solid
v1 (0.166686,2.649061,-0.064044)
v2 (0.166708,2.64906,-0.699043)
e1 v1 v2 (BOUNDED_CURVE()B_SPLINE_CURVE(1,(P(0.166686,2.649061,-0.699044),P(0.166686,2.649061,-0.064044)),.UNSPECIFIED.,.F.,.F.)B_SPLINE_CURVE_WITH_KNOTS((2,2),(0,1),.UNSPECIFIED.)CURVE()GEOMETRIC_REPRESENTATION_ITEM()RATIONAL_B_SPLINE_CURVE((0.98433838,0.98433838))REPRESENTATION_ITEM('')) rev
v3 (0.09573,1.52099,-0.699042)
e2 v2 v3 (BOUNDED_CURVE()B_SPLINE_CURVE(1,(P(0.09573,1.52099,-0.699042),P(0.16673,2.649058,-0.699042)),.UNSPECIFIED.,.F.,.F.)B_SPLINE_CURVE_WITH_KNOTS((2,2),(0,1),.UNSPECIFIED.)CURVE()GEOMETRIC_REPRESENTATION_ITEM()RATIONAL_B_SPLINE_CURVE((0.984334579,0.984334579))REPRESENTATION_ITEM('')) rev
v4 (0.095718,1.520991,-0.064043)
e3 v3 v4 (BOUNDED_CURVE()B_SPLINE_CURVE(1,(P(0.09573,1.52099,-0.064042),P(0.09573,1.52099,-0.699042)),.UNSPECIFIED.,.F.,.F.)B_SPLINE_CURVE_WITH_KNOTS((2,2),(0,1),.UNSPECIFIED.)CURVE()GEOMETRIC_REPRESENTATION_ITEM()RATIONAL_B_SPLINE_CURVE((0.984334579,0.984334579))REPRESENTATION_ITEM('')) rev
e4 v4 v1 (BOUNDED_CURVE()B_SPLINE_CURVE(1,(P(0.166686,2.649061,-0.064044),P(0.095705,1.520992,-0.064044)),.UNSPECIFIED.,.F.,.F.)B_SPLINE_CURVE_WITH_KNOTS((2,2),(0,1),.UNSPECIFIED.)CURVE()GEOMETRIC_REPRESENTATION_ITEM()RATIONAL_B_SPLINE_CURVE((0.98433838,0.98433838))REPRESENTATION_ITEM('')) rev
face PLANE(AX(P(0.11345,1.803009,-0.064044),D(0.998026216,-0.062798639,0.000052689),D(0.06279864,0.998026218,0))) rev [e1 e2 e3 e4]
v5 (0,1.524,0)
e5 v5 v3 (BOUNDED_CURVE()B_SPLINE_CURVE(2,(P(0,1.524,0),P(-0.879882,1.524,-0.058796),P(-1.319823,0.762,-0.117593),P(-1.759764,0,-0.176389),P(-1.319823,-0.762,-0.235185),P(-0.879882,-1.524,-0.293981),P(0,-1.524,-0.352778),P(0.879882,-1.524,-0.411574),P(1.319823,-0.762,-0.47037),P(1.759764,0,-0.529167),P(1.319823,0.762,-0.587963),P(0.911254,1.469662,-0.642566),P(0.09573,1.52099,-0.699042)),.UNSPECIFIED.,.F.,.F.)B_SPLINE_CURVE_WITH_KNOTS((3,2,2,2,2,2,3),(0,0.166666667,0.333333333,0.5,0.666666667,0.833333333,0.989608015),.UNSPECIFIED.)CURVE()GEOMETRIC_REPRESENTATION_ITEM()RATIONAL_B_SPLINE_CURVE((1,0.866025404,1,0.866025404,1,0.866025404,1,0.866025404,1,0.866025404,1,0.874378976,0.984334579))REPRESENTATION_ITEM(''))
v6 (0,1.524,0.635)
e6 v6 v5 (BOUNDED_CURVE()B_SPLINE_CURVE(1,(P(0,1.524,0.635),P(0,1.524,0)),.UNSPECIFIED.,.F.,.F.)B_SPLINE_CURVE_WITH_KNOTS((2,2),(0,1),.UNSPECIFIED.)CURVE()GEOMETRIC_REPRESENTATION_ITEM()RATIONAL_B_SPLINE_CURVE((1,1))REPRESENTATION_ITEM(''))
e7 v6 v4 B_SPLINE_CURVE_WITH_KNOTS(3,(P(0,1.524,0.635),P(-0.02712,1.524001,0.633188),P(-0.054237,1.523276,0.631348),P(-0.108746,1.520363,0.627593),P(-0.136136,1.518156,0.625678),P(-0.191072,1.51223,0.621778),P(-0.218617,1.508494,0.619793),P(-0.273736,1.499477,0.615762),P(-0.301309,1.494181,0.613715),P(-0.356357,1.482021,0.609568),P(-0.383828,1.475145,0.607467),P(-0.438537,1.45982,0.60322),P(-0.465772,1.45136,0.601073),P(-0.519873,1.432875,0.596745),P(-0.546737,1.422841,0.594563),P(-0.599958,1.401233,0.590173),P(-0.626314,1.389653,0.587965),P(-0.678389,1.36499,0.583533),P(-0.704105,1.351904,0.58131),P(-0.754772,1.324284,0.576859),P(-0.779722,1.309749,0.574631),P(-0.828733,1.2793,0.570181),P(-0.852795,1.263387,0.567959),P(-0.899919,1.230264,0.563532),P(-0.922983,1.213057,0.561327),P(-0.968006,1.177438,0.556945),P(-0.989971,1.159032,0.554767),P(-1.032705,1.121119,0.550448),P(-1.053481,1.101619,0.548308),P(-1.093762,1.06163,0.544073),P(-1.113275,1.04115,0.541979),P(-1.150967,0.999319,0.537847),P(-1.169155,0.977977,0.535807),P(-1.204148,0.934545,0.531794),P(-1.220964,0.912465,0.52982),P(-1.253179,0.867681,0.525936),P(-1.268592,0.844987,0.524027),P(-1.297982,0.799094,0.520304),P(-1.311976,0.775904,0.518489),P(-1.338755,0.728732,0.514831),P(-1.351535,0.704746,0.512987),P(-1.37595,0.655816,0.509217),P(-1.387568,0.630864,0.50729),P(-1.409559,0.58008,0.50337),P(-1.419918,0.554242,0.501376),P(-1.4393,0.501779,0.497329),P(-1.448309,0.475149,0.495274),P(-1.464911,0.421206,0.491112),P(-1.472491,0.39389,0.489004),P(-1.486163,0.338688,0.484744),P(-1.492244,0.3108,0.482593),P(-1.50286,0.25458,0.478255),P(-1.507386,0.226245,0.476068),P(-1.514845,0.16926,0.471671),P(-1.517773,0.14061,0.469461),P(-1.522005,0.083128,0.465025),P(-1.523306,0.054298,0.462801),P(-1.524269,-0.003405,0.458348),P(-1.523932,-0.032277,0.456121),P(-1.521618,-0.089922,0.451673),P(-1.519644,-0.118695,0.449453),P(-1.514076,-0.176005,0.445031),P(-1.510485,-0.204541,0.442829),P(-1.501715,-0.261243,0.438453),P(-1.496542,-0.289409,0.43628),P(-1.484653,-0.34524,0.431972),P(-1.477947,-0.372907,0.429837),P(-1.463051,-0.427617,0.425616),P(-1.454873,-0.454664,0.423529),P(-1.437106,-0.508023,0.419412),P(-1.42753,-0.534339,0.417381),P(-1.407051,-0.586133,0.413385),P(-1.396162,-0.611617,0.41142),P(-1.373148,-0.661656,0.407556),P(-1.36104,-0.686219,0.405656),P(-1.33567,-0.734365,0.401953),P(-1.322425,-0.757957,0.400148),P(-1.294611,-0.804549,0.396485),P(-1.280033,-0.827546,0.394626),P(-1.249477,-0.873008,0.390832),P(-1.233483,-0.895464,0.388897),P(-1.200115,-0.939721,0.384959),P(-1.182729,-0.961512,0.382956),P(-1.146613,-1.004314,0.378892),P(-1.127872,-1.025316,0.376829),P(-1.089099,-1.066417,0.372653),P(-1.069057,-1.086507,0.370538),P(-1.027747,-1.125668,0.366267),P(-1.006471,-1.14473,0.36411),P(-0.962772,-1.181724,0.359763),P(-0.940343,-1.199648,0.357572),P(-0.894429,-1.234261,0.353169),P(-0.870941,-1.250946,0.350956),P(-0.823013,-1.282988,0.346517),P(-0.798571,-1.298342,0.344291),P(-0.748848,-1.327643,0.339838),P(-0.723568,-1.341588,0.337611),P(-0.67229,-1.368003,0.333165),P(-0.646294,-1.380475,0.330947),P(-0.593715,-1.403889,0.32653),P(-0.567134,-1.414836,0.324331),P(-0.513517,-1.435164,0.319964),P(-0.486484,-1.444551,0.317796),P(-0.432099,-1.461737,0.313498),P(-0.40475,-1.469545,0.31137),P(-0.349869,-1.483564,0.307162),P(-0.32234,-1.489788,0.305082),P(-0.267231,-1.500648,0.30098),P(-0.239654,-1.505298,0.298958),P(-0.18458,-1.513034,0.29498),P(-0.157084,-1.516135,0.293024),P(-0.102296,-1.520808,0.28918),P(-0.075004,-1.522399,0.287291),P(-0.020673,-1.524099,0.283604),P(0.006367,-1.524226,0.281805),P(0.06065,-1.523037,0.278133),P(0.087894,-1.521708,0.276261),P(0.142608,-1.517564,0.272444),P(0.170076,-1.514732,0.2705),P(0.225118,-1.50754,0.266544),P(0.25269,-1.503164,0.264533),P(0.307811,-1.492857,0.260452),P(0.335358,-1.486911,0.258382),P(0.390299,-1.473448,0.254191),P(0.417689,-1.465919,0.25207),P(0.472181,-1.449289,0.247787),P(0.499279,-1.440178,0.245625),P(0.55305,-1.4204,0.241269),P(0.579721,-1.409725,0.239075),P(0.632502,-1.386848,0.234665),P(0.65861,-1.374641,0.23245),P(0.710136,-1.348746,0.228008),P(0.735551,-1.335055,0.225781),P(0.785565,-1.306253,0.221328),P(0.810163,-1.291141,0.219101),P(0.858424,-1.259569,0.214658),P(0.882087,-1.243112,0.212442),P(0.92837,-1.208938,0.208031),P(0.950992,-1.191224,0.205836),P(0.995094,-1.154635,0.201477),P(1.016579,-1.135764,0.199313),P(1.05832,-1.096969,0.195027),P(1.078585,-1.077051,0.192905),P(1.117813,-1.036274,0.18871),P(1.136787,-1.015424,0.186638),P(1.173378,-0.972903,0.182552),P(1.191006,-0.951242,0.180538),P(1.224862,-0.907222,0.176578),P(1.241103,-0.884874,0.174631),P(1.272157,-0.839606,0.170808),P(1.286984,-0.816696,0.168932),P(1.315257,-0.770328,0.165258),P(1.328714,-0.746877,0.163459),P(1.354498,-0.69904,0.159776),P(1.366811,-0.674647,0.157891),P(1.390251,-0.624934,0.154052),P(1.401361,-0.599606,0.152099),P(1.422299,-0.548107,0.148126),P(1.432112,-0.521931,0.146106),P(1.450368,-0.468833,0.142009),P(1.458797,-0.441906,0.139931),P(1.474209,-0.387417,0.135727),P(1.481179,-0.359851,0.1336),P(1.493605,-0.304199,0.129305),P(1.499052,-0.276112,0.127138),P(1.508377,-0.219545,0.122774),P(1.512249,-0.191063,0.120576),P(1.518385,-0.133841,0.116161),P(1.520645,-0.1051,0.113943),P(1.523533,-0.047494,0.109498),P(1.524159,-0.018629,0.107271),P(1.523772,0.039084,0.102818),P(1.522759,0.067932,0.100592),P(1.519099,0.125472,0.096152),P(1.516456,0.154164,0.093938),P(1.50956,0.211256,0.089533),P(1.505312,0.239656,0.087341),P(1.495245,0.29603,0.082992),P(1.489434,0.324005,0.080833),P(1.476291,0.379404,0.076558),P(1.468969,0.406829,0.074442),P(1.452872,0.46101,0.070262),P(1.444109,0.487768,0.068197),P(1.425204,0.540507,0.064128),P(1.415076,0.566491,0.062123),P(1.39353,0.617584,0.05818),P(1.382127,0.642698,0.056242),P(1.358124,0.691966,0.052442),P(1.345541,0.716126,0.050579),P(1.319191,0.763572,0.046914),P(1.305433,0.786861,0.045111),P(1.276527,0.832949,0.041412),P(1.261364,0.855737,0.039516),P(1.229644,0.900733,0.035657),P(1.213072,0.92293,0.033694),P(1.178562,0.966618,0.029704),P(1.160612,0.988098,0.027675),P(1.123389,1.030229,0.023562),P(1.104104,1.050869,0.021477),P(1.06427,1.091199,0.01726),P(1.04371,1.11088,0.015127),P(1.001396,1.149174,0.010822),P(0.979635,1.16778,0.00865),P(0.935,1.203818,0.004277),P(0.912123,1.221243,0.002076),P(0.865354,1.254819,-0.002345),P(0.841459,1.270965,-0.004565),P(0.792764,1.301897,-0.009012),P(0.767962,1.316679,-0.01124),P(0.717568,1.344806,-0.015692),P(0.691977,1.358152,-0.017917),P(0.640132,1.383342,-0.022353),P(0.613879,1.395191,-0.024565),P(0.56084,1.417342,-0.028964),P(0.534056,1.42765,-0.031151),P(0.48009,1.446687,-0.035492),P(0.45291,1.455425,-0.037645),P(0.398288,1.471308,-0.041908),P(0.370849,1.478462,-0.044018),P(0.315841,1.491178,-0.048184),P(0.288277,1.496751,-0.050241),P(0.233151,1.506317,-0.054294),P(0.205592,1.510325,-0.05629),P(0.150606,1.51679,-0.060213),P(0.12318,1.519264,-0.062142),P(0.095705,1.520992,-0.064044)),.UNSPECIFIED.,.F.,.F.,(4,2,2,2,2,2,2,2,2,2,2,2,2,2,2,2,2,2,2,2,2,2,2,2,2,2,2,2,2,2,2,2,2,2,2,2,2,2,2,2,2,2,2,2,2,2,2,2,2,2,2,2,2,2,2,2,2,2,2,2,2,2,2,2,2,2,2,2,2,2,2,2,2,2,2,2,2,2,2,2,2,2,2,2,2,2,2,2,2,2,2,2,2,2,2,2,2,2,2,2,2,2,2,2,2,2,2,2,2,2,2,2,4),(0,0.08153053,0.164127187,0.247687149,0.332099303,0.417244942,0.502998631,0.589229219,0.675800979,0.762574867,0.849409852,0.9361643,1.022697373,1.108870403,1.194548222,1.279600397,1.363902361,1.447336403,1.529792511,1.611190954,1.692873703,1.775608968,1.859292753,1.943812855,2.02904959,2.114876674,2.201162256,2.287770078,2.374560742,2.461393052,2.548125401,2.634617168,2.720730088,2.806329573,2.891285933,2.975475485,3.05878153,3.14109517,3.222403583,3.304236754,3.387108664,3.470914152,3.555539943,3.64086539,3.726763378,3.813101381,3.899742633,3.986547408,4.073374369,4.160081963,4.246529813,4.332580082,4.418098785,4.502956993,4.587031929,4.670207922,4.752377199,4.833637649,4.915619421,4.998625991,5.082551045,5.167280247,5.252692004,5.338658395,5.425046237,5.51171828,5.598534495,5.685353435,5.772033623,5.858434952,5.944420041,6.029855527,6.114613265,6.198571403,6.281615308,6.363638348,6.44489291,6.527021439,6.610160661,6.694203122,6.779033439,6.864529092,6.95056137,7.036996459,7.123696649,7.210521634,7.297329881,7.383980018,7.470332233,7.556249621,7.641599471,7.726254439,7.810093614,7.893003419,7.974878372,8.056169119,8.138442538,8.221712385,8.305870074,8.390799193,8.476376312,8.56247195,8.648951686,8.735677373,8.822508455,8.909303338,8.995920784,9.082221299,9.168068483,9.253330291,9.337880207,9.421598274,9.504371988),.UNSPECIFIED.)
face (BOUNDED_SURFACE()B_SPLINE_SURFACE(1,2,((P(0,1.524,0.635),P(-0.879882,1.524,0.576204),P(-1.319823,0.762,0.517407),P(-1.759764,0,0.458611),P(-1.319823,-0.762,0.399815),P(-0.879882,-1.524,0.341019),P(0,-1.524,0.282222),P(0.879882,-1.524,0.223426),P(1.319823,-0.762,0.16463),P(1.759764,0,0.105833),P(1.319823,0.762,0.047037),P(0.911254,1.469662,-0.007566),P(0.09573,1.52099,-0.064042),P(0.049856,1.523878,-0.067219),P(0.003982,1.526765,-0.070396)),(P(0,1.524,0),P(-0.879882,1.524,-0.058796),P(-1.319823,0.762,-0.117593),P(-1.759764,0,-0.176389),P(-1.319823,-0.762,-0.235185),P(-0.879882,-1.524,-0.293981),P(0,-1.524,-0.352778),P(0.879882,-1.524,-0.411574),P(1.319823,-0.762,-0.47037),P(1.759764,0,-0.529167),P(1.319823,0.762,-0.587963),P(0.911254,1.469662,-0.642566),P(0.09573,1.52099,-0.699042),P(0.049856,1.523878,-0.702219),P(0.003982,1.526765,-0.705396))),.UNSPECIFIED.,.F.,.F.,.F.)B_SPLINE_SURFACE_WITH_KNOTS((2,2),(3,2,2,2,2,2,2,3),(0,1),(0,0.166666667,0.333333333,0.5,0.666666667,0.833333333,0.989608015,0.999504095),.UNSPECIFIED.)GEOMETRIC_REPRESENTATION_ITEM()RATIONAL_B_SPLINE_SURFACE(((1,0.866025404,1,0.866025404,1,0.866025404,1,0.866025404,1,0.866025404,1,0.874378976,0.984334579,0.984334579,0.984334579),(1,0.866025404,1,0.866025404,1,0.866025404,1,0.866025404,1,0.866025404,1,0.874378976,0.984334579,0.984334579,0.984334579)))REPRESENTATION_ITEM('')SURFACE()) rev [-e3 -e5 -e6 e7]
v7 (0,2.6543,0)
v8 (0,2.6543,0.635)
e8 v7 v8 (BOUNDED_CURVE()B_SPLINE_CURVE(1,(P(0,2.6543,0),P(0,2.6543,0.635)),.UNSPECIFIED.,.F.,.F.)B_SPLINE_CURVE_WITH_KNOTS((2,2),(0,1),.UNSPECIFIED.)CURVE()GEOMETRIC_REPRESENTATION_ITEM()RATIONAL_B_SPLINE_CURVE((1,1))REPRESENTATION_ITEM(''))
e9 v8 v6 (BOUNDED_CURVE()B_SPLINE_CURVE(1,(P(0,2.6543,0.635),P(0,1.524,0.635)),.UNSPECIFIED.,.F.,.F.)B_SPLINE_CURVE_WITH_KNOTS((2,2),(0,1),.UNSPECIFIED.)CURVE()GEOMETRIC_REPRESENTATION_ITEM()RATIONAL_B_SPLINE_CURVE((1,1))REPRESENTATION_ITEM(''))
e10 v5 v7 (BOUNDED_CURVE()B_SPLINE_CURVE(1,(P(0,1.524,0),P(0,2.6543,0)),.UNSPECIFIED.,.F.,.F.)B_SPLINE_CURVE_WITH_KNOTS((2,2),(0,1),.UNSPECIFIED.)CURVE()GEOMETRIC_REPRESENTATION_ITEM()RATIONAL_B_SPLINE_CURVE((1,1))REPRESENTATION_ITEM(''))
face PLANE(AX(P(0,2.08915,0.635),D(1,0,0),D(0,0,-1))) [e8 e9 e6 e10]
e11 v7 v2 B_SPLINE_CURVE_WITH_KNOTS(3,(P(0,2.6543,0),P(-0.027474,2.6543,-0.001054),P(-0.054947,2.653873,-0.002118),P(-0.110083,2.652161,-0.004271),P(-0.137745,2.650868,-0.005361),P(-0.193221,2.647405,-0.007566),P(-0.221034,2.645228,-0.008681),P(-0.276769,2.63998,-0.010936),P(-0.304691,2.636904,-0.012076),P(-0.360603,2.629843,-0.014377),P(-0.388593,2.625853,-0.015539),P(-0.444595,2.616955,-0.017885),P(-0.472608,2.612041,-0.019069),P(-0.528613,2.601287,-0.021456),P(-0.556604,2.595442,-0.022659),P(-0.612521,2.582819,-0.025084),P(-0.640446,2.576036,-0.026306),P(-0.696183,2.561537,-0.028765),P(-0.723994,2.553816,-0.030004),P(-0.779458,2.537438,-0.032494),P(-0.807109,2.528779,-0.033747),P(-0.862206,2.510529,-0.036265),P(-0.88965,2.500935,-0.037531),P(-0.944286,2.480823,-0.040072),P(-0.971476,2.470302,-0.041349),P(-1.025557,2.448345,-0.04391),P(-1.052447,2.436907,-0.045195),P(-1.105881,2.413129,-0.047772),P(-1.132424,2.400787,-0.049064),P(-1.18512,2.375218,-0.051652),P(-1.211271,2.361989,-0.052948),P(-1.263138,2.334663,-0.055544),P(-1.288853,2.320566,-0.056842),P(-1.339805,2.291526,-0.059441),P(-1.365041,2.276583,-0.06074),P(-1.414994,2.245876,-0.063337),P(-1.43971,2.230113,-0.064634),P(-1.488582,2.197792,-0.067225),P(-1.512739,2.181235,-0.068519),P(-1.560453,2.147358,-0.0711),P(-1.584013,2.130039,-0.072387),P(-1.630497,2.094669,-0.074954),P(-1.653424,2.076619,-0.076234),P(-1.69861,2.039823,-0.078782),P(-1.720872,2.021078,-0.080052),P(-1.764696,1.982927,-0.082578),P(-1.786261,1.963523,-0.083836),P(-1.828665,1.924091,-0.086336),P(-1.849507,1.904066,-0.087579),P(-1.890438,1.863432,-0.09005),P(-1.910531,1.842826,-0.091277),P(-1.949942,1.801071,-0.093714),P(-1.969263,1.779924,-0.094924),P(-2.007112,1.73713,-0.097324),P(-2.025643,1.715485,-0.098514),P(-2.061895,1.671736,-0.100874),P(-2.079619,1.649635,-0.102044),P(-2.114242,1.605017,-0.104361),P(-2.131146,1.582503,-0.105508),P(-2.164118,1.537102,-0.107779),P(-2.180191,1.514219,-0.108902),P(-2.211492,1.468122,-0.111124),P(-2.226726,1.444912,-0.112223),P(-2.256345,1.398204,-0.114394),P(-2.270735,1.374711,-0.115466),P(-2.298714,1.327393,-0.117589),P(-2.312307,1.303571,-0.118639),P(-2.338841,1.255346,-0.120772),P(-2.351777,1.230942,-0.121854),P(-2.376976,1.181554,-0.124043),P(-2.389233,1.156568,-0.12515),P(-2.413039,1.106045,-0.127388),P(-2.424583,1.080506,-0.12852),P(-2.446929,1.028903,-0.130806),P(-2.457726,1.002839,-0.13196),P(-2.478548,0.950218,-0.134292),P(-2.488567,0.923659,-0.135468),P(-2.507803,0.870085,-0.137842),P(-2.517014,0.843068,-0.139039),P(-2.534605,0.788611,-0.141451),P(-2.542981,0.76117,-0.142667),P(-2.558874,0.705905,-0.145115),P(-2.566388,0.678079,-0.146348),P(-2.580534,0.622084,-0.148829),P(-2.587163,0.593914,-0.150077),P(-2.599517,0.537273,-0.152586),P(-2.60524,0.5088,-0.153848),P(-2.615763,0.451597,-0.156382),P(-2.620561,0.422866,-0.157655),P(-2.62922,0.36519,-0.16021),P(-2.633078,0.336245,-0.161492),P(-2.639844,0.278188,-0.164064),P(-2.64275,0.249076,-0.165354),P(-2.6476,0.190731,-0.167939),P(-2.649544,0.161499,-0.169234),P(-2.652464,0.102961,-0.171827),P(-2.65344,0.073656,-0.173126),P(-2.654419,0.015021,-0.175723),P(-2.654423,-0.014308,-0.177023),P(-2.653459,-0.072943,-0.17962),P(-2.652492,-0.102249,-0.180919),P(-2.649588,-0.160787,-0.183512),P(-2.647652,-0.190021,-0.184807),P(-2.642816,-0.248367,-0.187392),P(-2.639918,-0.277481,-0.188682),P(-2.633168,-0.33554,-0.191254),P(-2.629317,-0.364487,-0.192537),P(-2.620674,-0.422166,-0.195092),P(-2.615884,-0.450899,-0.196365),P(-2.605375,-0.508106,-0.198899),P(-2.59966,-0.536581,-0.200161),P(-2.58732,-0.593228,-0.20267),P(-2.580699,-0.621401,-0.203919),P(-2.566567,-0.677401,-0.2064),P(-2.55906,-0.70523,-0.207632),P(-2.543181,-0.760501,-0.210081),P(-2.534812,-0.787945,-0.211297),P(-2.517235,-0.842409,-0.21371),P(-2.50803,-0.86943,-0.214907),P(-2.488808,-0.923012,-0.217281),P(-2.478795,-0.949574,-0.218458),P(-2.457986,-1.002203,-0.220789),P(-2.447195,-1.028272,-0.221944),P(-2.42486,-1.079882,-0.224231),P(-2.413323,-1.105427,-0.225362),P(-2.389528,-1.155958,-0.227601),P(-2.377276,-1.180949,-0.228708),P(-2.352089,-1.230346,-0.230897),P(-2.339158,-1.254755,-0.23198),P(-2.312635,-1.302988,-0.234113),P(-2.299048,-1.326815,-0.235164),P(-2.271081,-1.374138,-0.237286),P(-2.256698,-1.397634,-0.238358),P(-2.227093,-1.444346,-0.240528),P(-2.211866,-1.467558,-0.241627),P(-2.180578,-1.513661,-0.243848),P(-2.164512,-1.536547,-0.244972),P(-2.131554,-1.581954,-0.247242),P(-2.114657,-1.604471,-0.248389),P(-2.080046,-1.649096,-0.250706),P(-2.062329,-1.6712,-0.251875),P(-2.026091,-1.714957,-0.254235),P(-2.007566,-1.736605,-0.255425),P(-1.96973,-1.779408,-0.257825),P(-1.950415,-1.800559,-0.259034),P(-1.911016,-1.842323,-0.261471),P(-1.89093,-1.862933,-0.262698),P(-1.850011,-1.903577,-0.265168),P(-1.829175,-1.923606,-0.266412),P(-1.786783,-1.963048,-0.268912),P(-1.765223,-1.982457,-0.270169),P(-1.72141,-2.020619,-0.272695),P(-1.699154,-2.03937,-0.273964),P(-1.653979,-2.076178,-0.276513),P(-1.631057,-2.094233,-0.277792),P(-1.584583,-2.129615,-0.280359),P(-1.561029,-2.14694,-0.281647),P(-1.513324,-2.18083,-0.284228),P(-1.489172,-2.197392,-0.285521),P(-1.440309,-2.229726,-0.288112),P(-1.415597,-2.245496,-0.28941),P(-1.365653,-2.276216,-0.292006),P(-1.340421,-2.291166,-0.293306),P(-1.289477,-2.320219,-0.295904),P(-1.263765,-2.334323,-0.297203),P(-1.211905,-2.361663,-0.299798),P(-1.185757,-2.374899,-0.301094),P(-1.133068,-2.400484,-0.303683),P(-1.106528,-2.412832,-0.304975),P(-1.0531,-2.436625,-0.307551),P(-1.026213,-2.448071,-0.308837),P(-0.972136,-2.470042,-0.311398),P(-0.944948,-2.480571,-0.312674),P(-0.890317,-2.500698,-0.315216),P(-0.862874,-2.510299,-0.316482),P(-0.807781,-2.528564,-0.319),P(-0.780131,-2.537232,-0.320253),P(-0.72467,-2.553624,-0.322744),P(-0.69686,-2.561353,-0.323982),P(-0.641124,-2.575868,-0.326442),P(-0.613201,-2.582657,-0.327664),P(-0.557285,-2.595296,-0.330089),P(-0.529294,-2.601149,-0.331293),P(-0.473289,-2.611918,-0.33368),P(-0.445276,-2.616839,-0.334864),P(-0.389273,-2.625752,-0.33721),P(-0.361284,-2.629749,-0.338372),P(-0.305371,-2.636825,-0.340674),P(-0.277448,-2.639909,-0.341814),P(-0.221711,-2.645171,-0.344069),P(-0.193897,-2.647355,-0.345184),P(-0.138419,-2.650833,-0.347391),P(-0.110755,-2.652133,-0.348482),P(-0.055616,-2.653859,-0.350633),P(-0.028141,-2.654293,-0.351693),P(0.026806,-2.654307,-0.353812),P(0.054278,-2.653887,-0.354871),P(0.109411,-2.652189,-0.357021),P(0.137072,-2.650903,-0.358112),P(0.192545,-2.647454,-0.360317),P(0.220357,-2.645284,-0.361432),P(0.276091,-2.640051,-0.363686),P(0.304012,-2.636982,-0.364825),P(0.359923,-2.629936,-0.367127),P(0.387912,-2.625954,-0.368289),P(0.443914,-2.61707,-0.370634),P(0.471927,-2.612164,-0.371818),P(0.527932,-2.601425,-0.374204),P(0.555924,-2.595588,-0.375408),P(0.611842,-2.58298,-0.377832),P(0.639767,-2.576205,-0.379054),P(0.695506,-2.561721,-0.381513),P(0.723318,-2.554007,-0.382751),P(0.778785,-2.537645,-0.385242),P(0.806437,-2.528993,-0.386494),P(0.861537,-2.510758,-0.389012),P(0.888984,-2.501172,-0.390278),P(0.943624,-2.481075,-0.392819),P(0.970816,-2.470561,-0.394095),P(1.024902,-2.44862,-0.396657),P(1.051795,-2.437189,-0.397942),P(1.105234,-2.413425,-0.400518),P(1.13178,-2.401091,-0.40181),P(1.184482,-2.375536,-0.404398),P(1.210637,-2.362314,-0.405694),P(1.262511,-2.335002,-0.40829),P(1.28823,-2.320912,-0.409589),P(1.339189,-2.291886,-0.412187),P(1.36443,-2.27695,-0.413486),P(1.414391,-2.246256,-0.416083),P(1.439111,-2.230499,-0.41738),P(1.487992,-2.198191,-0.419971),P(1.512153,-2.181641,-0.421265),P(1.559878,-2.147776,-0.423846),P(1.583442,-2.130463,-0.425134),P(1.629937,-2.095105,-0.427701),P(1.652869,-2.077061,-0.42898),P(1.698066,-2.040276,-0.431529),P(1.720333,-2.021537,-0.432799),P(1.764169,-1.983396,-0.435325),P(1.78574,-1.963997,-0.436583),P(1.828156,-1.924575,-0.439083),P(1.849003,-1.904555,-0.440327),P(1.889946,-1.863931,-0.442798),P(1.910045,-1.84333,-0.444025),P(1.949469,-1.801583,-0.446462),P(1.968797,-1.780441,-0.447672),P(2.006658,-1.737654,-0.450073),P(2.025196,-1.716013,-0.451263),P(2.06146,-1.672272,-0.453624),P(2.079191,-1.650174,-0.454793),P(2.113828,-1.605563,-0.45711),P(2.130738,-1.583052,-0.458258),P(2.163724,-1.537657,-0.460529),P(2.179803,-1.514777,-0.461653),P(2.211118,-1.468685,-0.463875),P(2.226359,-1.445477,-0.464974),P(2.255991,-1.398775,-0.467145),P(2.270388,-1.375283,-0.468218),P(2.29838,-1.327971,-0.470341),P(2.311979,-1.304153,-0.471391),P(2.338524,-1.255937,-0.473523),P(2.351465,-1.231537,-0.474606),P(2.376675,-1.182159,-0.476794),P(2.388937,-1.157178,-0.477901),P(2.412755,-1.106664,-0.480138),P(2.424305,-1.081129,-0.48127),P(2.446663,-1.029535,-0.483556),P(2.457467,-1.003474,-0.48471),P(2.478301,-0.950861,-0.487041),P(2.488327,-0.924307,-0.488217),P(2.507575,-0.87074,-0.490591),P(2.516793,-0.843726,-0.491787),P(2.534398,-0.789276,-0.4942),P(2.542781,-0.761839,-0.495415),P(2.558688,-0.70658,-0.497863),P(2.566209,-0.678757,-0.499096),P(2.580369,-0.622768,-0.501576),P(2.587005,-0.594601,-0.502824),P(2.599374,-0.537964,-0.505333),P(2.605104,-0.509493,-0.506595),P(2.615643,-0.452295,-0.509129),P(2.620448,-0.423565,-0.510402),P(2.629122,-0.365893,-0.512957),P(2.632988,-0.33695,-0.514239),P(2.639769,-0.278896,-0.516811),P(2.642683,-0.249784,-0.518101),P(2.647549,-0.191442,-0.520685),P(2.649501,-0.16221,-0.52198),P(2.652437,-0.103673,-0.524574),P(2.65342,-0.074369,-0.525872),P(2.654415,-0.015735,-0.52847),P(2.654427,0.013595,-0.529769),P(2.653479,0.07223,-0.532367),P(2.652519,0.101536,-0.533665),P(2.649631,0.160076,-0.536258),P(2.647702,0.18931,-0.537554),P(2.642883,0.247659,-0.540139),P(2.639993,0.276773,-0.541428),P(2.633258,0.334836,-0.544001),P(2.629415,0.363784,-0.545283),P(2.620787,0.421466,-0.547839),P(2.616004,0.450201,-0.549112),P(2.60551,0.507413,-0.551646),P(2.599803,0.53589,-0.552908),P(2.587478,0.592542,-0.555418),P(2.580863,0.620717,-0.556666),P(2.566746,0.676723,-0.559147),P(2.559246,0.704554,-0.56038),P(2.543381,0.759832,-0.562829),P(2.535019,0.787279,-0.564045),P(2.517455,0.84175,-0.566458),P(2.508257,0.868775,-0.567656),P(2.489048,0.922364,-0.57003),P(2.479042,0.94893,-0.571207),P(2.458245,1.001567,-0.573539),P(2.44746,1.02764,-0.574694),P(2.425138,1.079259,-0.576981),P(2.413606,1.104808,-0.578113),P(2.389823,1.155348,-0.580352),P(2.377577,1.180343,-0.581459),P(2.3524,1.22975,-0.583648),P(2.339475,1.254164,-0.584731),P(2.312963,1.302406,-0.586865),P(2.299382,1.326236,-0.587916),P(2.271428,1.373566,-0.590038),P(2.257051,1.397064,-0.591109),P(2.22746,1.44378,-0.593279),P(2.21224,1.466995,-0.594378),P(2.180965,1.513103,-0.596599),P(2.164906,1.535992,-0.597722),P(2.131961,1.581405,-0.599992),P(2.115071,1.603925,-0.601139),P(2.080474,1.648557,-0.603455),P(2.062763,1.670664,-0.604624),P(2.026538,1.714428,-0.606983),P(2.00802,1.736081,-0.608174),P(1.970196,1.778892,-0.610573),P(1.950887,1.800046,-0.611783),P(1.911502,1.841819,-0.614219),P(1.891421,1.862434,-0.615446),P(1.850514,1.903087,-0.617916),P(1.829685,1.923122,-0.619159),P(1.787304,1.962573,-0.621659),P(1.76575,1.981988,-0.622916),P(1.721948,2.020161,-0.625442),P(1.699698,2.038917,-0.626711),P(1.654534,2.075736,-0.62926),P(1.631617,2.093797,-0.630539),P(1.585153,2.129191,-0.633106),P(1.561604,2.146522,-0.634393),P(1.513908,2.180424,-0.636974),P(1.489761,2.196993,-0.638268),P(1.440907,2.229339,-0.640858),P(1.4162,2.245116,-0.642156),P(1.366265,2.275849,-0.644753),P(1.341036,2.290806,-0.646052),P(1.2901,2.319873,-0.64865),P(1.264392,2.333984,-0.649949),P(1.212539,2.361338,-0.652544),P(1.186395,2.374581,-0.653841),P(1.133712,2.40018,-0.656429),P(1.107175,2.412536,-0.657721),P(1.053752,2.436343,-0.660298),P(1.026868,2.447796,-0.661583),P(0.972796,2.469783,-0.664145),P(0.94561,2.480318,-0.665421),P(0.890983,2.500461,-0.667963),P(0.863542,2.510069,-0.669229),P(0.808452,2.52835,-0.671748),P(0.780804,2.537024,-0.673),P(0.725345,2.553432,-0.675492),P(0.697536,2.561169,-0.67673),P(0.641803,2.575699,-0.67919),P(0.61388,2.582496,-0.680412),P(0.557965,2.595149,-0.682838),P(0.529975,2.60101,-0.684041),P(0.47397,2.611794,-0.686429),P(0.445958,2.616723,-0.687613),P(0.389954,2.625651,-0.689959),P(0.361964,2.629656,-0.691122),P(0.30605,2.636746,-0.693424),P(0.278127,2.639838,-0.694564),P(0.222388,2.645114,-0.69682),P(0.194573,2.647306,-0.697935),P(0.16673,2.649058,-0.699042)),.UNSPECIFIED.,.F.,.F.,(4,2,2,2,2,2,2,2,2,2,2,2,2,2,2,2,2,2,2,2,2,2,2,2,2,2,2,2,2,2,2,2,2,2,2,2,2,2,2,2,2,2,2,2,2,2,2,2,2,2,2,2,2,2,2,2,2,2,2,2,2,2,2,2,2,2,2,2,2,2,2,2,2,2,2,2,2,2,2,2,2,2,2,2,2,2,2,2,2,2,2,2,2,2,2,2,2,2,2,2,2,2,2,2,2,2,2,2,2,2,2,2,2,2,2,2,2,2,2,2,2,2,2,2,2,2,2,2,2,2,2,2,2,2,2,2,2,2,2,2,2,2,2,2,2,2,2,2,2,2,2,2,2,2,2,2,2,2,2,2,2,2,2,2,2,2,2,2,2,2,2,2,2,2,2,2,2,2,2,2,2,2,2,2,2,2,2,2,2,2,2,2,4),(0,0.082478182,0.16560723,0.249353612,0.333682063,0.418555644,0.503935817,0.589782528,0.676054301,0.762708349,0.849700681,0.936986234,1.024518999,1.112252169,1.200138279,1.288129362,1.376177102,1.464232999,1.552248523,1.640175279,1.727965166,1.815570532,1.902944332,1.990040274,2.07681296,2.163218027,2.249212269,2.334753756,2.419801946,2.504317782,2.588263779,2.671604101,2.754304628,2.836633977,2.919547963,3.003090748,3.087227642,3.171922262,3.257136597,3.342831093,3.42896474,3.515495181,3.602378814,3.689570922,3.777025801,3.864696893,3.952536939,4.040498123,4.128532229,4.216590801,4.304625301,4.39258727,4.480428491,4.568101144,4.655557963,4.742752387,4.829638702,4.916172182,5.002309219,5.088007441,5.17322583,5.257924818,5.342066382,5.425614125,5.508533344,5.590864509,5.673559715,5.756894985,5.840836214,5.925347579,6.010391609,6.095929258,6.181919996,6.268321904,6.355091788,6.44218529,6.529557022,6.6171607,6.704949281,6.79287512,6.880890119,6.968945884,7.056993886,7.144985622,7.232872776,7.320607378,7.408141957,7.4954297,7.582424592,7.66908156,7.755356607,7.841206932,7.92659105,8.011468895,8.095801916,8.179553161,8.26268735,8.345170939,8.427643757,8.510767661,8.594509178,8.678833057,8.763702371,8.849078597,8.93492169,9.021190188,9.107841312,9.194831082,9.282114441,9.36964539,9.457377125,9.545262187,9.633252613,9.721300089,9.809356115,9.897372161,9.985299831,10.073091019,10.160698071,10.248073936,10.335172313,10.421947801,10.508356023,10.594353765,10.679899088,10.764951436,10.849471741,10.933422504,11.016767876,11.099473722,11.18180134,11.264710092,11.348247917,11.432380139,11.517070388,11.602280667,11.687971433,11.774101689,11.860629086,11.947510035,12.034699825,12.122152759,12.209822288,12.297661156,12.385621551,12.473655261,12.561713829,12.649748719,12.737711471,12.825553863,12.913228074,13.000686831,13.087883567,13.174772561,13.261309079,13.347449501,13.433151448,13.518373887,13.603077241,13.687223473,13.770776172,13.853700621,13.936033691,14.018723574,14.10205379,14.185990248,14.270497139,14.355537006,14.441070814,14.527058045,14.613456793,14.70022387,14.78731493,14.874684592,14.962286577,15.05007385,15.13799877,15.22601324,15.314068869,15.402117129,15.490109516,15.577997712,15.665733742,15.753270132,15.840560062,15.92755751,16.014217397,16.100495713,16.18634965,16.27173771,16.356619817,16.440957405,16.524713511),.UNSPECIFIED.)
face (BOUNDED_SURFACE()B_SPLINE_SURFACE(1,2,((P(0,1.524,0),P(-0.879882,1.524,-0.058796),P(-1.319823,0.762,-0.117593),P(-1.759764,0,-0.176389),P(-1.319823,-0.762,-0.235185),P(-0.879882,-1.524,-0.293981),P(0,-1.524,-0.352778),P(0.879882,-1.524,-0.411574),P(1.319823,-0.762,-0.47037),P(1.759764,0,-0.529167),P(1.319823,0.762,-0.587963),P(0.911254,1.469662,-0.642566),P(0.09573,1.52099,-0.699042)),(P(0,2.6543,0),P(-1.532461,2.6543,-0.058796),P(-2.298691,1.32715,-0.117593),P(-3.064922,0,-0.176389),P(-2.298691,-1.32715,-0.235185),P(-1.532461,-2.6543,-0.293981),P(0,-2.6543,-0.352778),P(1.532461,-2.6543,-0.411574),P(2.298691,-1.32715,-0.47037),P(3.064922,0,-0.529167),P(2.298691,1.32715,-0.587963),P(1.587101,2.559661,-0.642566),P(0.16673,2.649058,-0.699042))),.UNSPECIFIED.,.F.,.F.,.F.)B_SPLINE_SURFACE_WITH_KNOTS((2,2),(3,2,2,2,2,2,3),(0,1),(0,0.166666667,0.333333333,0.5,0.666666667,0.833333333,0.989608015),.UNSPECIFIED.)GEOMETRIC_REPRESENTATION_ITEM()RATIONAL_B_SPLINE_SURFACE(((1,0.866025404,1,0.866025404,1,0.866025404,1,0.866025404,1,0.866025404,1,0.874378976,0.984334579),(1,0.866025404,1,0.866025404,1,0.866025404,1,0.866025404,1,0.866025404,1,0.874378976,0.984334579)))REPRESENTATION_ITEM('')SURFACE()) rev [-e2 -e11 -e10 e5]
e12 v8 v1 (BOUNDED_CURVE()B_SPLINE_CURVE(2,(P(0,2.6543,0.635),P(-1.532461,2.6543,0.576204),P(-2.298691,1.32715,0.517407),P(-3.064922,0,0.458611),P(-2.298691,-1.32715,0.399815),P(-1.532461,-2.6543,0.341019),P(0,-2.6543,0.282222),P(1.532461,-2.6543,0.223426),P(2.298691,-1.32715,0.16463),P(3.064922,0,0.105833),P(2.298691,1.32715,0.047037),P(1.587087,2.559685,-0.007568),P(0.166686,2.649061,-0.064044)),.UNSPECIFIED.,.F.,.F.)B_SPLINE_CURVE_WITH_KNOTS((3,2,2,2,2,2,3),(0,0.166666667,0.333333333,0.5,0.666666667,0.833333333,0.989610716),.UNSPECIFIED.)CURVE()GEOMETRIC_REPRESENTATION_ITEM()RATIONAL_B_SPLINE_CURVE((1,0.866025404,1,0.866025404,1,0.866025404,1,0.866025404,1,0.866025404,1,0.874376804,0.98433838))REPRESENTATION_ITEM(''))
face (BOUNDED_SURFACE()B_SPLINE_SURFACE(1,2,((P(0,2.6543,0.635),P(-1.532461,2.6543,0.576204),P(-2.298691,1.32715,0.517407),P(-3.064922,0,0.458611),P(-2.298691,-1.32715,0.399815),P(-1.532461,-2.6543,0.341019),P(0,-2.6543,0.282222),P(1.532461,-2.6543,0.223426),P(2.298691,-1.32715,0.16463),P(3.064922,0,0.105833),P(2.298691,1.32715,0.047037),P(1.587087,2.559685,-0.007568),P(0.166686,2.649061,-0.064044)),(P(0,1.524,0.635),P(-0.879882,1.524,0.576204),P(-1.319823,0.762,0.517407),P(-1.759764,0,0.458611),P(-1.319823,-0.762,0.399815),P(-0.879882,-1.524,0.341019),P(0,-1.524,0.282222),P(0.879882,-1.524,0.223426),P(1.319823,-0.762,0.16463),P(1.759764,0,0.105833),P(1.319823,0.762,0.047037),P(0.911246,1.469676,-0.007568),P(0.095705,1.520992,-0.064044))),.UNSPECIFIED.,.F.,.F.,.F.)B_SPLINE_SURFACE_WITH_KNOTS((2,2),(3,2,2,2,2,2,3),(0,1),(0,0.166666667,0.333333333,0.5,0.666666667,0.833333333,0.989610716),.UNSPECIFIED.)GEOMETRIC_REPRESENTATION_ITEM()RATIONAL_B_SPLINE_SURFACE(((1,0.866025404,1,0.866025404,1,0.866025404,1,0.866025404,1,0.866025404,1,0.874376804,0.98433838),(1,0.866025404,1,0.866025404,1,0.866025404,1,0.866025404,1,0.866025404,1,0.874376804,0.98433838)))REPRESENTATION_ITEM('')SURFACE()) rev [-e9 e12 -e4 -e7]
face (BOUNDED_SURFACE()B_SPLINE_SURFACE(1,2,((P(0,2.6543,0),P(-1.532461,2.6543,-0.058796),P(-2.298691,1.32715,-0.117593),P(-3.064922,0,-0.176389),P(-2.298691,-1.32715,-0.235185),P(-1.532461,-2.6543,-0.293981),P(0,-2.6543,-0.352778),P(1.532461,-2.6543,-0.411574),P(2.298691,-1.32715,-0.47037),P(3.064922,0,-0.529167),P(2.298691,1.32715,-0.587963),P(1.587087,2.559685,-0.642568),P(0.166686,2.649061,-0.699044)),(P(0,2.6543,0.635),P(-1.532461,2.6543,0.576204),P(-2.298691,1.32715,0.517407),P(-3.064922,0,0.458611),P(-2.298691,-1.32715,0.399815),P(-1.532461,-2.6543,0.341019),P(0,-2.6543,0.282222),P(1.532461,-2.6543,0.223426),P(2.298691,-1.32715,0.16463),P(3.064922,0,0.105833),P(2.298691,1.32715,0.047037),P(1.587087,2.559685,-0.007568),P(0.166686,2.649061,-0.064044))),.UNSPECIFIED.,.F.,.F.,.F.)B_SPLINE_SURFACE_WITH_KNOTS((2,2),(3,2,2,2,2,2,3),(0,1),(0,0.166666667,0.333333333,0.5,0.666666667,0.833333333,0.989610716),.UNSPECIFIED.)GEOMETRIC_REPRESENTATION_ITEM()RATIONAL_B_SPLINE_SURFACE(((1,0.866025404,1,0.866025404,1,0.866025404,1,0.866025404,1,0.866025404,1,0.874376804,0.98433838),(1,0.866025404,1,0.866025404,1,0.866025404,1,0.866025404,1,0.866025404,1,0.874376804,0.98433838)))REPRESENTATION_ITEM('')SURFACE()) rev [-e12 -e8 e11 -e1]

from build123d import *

# Parameters (mm, degrees)
SWEEP1_PITCH = 0.705555556


with BuildPart() as part:
    # Sweep1: the profile of Sketch2 screwed along a left-hand helix of 0.99 turns, 6 arcs to a turn; built about Z, then put on its axis
    sweep1_z = Axis((0, 0, 0), (0, 0, 1))
    sweep1_corners = [(2.6543, 0, 0), (2.6543, 0, -0.635), (1.524, 0, -0.635), (1.524, 0, 0)]
    with BuildLine(mode=Mode.PRIVATE) as sweep1_profile:
        Line(sweep1_corners[0], sweep1_corners[1])
        Line(sweep1_corners[1], sweep1_corners[2])
        Line(sweep1_corners[2], sweep1_corners[3])
        Line(sweep1_corners[3], sweep1_corners[0])
    sweep1_cap = Face(sweep1_profile.wire())
    sweep1_turn_angles = [0, -30, -60, -90, -120, -150, -180, -210, -240, -270, -300, -328.2, -356.4]
    sweep1_turn_weights = [1, 0.8660254037844387, 1, 0.8660254037844387, 1, 0.8660254037844387, 1, 0.8660254037844387, 1, 0.8660254037844387, 1, 0.8813034520649883, 1]
    sweep1_turn_rails = [Edge.make_bspline([Vector(p[0], p[1], 0).rotate(sweep1_z, sweep1_turn_angles[k]) / sweep1_turn_weights[k] + Vector(0, 0, p[2] + -SWEEP1_PITCH * sweep1_turn_angles[k] / 360) for k in range(13)], [0, 0, 0, 1, 1, 2, 2, 3, 3, 4, 4, 5, 5, 6, 6, 6], 2, sweep1_turn_weights) for p in sweep1_corners]
    sweep1_turn_sides = [Face.make_surface_from_curves(sweep1_turn_rails[p[0]], sweep1_turn_rails[p[1]]) for p in [(0, 1), (1, 2), (2, 3), (3, 0)]]
    sweep1 = Plane(origin=(0, 0, 0), x_dir=(0, 1, 0), z_dir=(0, 0, -1)) * Solid(Shell([*sweep1_turn_sides, sweep1_cap, sweep1_cap.rotate(sweep1_z, -356.4).moved(Location((0, 0, -SWEEP1_PITCH * -356.4 / 360)))]))
    add(sweep1)


solid = part.part
